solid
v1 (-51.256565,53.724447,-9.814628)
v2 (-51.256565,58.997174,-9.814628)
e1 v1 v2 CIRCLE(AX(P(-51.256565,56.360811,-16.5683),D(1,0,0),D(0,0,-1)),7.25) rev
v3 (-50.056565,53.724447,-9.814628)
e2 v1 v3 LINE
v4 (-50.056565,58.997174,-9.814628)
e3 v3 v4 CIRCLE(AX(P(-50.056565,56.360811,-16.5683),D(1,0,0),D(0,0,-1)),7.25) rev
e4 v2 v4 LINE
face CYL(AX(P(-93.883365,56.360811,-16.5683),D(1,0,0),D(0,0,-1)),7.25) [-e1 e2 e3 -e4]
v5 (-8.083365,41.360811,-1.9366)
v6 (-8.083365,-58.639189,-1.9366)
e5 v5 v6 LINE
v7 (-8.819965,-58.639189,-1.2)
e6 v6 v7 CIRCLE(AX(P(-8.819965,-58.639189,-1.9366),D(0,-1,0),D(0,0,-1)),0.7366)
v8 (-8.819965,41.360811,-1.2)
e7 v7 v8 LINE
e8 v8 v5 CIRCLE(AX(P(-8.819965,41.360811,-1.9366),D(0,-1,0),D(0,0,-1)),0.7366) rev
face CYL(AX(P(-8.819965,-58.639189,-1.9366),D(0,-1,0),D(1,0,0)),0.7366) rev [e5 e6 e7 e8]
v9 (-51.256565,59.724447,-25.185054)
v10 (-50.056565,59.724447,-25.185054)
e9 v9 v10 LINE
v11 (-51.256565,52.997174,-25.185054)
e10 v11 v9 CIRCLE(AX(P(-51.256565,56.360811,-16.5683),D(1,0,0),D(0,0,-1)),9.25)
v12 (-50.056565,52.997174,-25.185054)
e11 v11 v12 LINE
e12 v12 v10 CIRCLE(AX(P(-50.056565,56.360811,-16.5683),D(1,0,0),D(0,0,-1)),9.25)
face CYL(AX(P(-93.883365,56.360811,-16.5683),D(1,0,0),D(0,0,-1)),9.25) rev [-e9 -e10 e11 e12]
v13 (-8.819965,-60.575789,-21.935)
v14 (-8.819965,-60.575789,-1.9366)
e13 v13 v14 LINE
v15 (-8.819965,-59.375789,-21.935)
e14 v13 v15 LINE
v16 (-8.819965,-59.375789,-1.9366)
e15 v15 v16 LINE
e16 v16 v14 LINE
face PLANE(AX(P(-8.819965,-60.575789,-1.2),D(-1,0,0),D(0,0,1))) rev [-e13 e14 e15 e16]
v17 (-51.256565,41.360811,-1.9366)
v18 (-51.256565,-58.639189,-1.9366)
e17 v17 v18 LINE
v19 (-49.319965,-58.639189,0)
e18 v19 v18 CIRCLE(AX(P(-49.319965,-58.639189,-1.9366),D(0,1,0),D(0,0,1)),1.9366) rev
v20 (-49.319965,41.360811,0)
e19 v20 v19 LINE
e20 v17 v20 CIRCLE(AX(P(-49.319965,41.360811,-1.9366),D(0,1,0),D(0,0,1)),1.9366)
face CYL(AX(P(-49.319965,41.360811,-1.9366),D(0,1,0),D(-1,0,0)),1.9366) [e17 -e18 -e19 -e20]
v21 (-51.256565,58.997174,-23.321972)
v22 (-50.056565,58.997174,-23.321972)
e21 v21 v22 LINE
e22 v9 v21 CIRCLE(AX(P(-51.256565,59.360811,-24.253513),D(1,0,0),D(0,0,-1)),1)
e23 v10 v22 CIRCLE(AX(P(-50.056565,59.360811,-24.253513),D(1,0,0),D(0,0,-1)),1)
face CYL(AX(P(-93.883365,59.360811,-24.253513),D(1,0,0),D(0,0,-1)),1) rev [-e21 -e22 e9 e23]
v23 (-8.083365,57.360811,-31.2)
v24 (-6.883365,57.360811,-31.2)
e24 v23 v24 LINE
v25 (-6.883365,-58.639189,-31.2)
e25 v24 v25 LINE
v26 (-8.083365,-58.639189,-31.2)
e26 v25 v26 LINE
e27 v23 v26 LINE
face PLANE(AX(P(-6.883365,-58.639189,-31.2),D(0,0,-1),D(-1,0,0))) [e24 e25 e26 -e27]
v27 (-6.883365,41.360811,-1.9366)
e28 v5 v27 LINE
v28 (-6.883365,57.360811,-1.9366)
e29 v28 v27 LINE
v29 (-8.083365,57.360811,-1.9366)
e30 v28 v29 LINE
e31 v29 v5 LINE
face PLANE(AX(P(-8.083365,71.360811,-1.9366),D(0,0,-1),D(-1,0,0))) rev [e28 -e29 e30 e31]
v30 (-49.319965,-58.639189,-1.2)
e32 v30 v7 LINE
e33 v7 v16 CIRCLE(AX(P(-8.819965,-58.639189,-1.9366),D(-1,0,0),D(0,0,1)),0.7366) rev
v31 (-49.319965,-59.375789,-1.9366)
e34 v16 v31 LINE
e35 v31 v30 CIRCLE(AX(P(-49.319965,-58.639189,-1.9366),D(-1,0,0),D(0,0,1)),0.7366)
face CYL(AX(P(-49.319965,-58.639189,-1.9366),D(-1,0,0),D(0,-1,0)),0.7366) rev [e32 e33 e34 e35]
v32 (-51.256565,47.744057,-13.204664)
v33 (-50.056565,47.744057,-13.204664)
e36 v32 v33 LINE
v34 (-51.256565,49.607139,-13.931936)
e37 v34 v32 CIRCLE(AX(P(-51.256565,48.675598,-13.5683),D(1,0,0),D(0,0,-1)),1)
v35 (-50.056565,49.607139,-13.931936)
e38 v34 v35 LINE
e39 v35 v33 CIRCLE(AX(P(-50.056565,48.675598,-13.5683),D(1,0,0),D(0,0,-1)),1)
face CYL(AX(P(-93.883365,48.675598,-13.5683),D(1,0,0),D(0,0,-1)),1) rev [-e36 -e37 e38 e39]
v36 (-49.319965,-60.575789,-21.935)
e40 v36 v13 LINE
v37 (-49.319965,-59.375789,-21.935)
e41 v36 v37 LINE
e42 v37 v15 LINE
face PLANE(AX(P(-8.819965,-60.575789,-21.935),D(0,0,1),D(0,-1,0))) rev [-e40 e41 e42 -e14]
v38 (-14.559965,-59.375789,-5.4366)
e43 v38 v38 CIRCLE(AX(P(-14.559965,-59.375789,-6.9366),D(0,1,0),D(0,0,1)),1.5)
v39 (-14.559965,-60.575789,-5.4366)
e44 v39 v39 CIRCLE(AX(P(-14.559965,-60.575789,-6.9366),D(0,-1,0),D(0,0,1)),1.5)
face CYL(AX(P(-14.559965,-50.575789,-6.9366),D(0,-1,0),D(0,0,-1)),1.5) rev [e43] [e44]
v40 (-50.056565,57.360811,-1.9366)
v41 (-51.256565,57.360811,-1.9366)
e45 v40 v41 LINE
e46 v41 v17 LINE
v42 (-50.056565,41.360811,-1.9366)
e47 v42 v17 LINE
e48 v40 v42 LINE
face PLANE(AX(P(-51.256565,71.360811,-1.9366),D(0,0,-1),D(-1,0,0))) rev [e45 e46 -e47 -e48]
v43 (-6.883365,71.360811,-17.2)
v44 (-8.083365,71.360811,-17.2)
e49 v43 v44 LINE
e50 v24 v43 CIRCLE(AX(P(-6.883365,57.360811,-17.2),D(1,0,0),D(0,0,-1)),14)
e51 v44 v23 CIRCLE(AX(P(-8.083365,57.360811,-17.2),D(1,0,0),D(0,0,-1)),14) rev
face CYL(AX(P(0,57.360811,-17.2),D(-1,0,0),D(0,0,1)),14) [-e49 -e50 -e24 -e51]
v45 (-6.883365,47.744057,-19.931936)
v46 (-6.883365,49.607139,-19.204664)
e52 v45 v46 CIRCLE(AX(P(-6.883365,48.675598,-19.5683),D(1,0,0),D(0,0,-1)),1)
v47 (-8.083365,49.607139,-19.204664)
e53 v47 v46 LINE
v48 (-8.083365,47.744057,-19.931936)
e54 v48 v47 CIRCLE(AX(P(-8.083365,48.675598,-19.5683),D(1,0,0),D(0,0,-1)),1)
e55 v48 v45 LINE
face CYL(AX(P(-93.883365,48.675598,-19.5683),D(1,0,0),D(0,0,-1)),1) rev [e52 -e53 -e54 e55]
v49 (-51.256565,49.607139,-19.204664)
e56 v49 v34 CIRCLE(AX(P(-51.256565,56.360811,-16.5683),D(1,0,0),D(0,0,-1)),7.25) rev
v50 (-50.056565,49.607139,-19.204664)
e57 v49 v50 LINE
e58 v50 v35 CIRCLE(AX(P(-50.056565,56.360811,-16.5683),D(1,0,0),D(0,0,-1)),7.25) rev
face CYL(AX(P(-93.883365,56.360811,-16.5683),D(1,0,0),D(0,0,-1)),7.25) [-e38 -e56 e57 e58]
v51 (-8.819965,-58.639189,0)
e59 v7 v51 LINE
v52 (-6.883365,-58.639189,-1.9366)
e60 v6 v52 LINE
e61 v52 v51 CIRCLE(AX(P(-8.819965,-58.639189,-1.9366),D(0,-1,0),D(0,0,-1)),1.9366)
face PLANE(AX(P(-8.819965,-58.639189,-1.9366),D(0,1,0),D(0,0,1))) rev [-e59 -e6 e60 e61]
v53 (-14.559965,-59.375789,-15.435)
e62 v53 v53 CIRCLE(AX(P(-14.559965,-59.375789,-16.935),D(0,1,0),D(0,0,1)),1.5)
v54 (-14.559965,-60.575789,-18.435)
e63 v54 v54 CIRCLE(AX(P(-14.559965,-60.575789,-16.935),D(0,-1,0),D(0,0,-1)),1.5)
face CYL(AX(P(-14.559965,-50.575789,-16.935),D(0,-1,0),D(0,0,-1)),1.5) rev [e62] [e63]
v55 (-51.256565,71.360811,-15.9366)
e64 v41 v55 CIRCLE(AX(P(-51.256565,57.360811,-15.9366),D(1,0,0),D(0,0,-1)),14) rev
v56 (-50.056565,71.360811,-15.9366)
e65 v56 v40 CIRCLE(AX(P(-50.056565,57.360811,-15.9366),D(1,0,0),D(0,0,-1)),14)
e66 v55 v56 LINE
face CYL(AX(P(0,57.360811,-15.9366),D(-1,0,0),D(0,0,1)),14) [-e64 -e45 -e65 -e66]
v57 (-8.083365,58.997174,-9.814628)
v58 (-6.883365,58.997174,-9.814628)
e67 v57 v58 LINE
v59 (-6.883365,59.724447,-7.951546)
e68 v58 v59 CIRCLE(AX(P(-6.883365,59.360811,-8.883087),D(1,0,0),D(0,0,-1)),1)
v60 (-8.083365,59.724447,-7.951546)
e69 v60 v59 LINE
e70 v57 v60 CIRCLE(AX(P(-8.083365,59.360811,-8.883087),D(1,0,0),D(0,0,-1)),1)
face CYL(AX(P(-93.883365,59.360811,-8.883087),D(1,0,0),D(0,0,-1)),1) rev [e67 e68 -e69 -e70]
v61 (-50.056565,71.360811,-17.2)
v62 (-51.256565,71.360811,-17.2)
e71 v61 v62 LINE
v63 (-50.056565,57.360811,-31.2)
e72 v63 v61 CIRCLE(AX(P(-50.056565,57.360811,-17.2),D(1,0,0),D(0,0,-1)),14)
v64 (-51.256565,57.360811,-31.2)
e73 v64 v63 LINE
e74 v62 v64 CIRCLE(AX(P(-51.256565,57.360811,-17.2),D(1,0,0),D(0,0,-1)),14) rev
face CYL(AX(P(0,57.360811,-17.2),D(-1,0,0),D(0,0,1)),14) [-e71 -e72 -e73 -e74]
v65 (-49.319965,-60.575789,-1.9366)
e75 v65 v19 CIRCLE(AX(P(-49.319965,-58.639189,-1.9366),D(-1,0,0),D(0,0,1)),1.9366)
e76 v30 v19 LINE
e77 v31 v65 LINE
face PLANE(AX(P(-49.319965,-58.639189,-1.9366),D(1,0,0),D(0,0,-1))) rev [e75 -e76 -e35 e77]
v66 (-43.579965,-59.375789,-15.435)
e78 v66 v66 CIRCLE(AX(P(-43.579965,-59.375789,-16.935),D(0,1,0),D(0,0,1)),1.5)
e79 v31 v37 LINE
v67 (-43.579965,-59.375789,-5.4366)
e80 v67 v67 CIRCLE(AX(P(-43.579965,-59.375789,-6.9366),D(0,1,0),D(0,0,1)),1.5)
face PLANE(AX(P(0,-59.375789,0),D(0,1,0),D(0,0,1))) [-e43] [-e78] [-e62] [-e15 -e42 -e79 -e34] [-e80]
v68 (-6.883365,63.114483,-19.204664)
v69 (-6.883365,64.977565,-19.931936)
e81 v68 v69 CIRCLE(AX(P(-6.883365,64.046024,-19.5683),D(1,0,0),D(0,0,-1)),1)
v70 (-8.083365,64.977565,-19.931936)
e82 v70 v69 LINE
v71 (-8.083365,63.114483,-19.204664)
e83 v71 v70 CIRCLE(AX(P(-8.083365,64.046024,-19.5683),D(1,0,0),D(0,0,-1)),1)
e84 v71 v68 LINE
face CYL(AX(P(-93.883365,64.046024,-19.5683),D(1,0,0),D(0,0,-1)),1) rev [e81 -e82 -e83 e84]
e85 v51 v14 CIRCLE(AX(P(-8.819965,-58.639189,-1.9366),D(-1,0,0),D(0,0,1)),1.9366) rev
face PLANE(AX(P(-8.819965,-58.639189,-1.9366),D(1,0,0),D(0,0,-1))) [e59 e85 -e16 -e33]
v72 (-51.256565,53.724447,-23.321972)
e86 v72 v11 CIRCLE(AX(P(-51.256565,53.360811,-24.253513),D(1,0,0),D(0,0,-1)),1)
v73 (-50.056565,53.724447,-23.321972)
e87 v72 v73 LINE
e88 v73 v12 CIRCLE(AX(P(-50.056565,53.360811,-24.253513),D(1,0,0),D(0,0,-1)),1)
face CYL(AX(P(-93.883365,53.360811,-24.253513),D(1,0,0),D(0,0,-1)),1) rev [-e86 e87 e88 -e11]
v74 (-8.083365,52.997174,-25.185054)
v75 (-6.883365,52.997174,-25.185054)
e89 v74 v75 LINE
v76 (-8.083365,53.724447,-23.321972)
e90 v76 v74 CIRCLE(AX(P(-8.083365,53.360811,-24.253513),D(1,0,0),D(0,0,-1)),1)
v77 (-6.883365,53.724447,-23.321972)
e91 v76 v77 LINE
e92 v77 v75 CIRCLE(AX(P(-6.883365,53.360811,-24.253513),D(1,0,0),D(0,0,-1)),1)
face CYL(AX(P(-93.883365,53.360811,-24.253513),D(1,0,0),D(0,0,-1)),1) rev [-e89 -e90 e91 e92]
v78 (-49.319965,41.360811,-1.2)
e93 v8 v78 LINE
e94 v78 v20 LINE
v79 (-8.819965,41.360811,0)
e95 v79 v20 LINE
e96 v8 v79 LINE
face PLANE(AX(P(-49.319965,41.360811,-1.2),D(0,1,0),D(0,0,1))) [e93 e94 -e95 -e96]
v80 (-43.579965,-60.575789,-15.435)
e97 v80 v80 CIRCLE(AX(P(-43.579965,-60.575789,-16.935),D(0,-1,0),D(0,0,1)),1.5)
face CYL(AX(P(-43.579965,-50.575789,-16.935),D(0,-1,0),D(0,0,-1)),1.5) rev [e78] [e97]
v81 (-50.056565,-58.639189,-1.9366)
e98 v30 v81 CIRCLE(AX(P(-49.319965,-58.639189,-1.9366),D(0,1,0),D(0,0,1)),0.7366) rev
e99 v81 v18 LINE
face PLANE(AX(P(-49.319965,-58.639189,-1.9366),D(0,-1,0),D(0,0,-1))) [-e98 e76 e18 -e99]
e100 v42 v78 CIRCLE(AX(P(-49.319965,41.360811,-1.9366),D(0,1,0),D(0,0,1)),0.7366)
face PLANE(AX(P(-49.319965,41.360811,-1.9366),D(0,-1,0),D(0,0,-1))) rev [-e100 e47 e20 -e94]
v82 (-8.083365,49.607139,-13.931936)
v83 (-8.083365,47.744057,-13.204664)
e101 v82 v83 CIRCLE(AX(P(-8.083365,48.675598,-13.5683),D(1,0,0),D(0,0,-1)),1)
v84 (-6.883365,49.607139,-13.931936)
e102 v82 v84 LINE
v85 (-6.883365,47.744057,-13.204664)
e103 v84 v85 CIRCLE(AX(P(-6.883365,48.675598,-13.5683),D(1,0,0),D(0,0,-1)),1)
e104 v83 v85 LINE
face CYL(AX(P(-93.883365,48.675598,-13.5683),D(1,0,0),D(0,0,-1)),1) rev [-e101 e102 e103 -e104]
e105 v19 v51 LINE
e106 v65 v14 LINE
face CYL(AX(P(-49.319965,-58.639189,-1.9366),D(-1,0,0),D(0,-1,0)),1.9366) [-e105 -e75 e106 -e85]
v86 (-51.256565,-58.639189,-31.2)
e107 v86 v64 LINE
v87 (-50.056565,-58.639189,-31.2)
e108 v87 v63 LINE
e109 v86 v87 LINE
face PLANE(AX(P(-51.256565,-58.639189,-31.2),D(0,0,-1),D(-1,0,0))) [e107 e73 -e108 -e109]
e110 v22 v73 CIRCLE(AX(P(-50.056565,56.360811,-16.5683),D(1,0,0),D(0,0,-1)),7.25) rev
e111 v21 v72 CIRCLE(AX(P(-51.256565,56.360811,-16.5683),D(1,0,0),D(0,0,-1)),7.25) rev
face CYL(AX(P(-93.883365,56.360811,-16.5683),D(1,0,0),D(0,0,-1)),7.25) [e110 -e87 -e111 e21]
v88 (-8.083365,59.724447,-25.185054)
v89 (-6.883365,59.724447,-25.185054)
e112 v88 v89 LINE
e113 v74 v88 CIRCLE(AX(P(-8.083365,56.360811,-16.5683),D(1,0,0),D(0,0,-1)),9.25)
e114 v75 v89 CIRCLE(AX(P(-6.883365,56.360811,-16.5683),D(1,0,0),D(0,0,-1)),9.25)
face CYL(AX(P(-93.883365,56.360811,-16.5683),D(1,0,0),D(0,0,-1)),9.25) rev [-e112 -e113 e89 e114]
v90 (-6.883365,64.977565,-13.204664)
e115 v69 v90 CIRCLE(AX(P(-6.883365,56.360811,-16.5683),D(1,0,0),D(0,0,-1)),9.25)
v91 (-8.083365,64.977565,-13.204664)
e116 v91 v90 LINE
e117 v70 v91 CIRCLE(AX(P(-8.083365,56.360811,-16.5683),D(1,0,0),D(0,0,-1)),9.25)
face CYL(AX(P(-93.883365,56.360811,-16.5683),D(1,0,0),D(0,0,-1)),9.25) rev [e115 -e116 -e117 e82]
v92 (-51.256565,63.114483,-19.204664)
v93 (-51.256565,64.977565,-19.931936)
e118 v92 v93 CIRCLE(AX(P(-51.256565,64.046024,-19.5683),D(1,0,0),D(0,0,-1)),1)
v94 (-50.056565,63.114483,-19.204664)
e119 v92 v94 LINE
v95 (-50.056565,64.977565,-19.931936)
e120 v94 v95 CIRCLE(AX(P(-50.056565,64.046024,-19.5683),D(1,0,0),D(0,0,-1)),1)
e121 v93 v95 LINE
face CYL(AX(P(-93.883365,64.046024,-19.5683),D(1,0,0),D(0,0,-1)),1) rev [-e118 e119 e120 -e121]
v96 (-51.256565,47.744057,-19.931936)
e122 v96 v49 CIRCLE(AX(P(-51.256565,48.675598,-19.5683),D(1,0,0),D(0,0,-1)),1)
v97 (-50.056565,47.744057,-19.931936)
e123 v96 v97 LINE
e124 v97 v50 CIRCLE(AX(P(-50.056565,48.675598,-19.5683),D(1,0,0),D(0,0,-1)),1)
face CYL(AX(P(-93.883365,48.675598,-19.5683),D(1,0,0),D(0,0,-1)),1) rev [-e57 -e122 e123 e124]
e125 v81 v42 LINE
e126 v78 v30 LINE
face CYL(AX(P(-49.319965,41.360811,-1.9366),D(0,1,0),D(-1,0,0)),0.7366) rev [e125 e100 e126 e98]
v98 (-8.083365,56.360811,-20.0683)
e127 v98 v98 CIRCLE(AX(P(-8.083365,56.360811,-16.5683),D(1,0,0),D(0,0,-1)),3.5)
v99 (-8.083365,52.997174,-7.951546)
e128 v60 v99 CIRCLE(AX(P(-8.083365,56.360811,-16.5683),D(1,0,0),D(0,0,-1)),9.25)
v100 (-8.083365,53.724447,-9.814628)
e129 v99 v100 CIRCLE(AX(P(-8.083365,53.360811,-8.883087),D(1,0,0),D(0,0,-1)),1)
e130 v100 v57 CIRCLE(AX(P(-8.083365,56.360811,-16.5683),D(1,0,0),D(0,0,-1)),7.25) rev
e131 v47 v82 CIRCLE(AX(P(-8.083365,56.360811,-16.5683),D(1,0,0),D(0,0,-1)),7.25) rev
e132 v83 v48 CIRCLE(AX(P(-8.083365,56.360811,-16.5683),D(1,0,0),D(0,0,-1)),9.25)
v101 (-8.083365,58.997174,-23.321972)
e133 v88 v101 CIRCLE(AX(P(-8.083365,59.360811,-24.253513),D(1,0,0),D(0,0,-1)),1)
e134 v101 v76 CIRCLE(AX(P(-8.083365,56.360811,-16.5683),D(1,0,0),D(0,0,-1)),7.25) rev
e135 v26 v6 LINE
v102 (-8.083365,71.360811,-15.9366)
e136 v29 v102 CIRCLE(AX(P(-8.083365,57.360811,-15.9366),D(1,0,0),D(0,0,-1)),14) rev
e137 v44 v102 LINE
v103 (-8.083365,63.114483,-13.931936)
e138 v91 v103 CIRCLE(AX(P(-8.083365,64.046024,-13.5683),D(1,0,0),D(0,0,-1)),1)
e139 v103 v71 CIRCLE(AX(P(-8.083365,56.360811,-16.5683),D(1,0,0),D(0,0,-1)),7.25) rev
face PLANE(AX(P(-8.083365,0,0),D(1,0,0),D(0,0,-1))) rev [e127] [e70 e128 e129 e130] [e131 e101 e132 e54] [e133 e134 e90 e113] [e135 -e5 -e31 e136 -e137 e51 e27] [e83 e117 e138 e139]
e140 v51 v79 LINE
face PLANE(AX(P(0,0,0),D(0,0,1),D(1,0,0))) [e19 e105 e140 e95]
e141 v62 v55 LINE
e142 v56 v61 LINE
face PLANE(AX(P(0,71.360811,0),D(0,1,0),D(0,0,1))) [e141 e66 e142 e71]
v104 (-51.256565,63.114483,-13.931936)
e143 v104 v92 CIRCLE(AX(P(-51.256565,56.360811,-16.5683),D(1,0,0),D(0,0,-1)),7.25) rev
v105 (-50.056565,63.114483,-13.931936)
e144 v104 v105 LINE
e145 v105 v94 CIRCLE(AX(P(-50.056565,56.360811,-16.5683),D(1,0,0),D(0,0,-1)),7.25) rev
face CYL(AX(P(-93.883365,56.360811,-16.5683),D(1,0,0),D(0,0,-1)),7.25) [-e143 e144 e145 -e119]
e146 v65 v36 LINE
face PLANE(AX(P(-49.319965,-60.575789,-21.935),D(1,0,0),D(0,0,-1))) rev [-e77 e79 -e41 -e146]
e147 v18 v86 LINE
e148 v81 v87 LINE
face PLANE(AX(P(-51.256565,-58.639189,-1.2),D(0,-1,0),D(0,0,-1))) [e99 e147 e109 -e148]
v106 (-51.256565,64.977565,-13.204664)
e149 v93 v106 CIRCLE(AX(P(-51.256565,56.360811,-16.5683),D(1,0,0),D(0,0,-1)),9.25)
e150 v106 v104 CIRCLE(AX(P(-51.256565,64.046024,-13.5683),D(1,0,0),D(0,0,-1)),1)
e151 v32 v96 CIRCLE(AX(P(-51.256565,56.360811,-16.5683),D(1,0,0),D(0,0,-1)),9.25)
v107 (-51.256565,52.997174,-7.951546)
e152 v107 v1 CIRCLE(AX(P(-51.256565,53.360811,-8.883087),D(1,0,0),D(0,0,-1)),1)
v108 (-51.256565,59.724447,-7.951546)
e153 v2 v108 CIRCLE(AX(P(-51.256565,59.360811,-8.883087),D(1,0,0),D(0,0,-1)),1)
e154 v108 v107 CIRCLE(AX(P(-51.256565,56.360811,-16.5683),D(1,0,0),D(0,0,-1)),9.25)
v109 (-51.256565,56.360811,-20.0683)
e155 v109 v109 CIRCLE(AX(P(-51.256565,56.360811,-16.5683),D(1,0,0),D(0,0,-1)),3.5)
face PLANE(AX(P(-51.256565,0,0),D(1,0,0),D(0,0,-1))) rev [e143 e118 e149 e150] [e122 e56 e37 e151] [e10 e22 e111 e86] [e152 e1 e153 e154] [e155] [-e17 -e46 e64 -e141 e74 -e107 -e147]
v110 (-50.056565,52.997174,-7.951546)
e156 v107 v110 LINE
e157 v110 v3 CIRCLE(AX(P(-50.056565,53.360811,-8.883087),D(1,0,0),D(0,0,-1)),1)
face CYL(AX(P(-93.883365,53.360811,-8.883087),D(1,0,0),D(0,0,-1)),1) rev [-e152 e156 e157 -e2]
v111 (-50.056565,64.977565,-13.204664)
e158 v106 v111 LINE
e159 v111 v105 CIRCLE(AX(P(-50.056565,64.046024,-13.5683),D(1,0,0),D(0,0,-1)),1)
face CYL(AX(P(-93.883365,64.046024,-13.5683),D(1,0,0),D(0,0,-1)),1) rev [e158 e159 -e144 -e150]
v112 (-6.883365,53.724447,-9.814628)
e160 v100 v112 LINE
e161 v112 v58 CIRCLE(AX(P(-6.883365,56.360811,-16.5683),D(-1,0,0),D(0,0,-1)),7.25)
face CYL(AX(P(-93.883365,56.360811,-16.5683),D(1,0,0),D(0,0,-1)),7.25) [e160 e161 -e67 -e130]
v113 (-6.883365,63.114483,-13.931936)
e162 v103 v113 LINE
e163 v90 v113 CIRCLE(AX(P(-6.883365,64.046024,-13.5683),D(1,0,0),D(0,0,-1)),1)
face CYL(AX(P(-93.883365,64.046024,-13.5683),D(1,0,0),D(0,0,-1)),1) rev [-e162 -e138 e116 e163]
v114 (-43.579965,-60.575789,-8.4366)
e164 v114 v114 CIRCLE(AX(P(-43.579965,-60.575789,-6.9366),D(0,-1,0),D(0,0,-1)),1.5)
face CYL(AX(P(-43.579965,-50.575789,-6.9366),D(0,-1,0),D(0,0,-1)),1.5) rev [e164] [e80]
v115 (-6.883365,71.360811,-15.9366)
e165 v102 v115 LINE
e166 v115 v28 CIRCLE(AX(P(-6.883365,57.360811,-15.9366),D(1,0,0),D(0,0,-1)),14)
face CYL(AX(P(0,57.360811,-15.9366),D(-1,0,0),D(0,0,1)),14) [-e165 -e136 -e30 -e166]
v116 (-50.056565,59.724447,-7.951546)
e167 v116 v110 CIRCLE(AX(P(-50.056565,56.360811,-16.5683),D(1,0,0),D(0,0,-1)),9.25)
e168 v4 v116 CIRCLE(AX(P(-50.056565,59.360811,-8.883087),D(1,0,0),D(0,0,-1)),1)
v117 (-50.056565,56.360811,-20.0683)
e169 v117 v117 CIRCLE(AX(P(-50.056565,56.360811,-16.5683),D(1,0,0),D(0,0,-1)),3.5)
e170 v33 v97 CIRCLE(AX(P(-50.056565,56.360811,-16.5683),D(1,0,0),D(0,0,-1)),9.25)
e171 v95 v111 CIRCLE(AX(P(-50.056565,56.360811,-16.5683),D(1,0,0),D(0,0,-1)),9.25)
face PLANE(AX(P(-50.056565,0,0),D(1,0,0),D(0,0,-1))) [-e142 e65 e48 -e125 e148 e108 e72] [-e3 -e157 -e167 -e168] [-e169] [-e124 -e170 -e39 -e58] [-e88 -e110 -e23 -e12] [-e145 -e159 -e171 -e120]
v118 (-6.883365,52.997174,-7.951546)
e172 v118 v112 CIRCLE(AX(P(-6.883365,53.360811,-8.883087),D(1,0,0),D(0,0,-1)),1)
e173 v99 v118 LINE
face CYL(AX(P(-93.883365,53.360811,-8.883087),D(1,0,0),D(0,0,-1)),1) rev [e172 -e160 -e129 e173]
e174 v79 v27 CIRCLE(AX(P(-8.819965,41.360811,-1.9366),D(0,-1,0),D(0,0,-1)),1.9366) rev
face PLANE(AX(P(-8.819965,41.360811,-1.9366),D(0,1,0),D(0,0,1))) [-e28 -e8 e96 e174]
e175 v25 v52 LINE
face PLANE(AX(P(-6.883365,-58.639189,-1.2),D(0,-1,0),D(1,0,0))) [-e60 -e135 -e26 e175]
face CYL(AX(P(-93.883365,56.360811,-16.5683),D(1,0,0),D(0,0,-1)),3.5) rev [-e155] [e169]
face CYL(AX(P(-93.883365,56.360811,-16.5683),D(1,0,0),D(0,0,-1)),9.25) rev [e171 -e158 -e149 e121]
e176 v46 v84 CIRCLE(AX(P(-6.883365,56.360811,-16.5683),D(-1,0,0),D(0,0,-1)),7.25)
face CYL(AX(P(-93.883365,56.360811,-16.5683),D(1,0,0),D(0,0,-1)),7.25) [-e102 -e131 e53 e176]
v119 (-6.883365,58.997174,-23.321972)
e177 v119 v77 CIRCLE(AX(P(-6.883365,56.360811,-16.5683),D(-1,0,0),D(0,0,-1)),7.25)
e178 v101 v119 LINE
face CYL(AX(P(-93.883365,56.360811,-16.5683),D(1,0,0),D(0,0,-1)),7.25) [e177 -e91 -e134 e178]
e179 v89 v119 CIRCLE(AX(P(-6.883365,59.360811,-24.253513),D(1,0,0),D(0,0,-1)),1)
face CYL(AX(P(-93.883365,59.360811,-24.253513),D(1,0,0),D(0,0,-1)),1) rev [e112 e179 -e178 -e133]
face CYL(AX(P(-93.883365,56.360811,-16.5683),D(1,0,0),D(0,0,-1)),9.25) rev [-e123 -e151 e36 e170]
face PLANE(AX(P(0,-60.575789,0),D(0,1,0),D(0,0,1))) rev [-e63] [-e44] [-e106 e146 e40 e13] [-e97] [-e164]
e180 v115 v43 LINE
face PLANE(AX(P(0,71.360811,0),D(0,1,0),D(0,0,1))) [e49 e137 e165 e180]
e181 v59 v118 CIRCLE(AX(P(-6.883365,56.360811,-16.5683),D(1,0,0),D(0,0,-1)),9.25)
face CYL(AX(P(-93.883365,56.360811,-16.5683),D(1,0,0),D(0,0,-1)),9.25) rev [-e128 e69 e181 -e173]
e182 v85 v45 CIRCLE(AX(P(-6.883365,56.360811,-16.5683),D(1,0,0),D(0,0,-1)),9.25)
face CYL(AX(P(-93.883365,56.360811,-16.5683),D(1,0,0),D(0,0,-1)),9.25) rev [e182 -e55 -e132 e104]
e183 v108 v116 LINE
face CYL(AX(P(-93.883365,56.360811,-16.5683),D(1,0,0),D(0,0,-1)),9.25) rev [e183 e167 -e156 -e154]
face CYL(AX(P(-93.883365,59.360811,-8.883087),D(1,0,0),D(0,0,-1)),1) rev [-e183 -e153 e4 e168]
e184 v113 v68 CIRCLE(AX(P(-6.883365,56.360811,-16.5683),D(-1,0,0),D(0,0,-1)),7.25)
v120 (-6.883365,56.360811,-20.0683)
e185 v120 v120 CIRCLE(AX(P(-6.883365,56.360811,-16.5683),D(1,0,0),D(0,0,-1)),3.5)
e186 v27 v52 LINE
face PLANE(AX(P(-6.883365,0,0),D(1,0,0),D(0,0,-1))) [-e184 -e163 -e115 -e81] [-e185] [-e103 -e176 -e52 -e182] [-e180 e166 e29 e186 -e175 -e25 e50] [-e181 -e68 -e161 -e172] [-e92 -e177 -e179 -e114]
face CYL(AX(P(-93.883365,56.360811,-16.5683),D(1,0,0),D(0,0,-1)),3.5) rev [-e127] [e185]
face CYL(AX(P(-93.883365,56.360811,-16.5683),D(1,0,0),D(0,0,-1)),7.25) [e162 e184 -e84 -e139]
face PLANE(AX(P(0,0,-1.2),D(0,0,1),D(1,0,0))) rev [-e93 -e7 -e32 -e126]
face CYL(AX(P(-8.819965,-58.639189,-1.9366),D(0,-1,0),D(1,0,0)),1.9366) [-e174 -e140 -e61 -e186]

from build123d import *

# Parameters (mm, degrees)
SKETCH_1_W                  = 40.5
SKETCH_1_H                  = 100
SM_BASE_FLANGE_1_DEPTH      = 1.2
SM_EDGE_FLANGE_1_DEPTH      = 100
SM_EDGE_FLANGE_1_BEND_DEPTH = 100
SM_EDGE_FLANGE_3_DEPTH      = 40.5
SKETCH_25_R                 = 1.5
CUT_EXTRUDE_1_DEPTH         = 10
SKETCH_26_W                 = 1.2
SKETCH_26_H                 = 29.2634
EXTRUDE_1_DEPTH             = 30
SKETCH_29_R                 = 3.5
CUT_EXTRUDE_2_DEPTH         = 87
FILLET_1_R                  = 14


# Sheet-metal steps are written as plain solids
with BuildPart() as part:
    # Sketch 1 → 基材-凸緣1 (new body)
    with BuildSketch(Plane.XY):
        with Locations((-29.069965263, -8.639189189)):
            Rectangle(SKETCH_1_W, SKETCH_1_H)
    extrude(amount=-SM_BASE_FLANGE_1_DEPTH)

    # 邊線-凸緣1 section (across the edge) → 邊線-凸緣1 (add)
    with BuildSketch(Plane(origin=(-8.083365263, 41.360810811, -1.2), x_dir=(-1, 0, 0), z_dir=(0, -1, 0))):
        with BuildLine():
            Line((-1.2, 0.7366), (-1.2, 30))
            Line((-1.2, 30), (0, 30))
            Line((0, 30), (0, 0.7366))
            ThreePointArc((0, 0.7366), (0.215745145, 0.215745145), (0.7366, 0))
            Line((0.7366, 0), (0.7366, -1.2))
            ThreePointArc((0.7366, -1.2), (-0.632782992, -0.632782992), (-1.2, 0.7366))
        make_face()
    extrude(amount=SM_EDGE_FLANGE_1_DEPTH)

    # 邊線-凸緣1 section 2 (across the edge) → 邊線-凸緣1 bend (add)
    with BuildSketch(Plane(origin=(-50.056565263, -58.639189189, -1.2), x_dir=(1, 0, 0), z_dir=(0, 1, 0))):
        with BuildLine():
            Line((-1.2, 0.7366), (-1.2, 30))
            Line((-1.2, 30), (0, 30))
            Line((0, 30), (0, 0.7366))
            ThreePointArc((0, 0.7366), (0.215745145, 0.215745145), (0.7366, 0))
            Line((0.7366, 0), (0.7366, -1.2))
            ThreePointArc((0.7366, -1.2), (-0.632782992, -0.632782992), (-1.2, 0.7366))
        make_face()
    extrude(amount=SM_EDGE_FLANGE_1_BEND_DEPTH)

    # 邊線-凸緣3 section (across the edge) → 邊線-凸緣3 (add)
    with BuildSketch(Plane(origin=(-8.819965263, -59.375789189, -1.2), x_dir=(0, 1, 0), z_dir=(-1, 0, 0))):
        with BuildLine():
            Line((-1.2, 0.7366), (-1.2, 20.735))
            Line((-1.2, 20.735), (0, 20.735))
            Line((0, 20.735), (0, 0.7366))
            ThreePointArc((0, 0.7366), (0.215745145, 0.215745145), (0.7366, 0))
            Line((0.7366, 0), (0.7366, -1.2))
            ThreePointArc((0.7366, -1.2), (-0.632782992, -0.632782992), (-1.2, 0.7366))
        make_face()
    extrude(amount=SM_EDGE_FLANGE_3_DEPTH)

    # 草圖25 → 除料-伸長1 (cut)
    with BuildSketch(Plane.XZ.offset(60.575789189)):
        with Locations(Location((-43.579965263, -6.9366, 0), (0, 0, 270))):
            Circle(SKETCH_25_R)
        with Locations(Location((-43.579965263, -16.935, 0), (0, 0, 90))):
            Circle(SKETCH_25_R)
        with Locations(Location((-14.559965263, -16.935, 0), (0, 0, 270))):
            Circle(SKETCH_25_R)
        with Locations(Location((-14.559965263, -6.9366, 0), (0, 0, 90))):
            Circle(SKETCH_25_R)
    extrude(amount=-CUT_EXTRUDE_1_DEPTH, mode=Mode.SUBTRACT)

    # 草圖26 → 填料-伸長1 (add)
    with BuildSketch(Plane(origin=(0, 41.360810811, 0), x_dir=(1, 0, 0), z_dir=(0, 1, 0))):
        with Locations((-50.656565263, 16.5683)):
            Rectangle(SKETCH_26_W, SKETCH_26_H)
        with Locations((-7.483365263, 16.5683)):
            Rectangle(SKETCH_26_W, SKETCH_26_H)
    extrude(amount=EXTRUDE_1_DEPTH)

    # 草圖29 → 除料-伸長2 (cut)
    with BuildSketch(Plane(origin=(-6.883365263, 0, 0), x_dir=(0, 0, -1), z_dir=(1, 0, 0))):
        with Locations((16.5683, 56.360810811)):
            Circle(SKETCH_29_R)
        with BuildLine():
            ThreePointArc((25.185054053, 52.997174447), (25.8183, 56.360810811), (25.185054053, 59.724447174))
            ThreePointArc((25.185054053, 59.724447174), (23.889876711, 60.29235179), (23.321972096, 58.997174447))
            ThreePointArc((23.321972096, 58.997174447), (23.8183, 56.360810811), (23.321972096, 53.724447174))
            ThreePointArc((23.321972096, 53.724447174), (23.889876711, 52.429269832), (25.185054053, 52.997174447))
        make_face()
        with BuildLine():
            ThreePointArc((13.204663636, 64.977564864), (12.636759021, 63.682387522), (13.931936364, 63.114482907))
            ThreePointArc((13.931936364, 63.114482907), (16.5683, 63.610810811), (19.204663636, 63.114482907))
            ThreePointArc((19.204663636, 63.114482907), (20.499840979, 63.682387522), (19.931936364, 64.977564864))
            ThreePointArc((19.931936364, 64.977564864), (16.5683, 65.610810811), (13.204663636, 64.977564864))
        make_face()
        with BuildLine():
            ThreePointArc((13.204663636, 47.744056758), (16.5683, 47.110810811), (19.931936364, 47.744056758))
            ThreePointArc((19.931936364, 47.744056758), (20.499840979, 49.0392341), (19.204663636, 49.607138715))
            ThreePointArc((19.204663636, 49.607138715), (16.5683, 49.110810811), (13.931936364, 49.607138715))
            ThreePointArc((13.931936364, 49.607138715), (12.636759021, 49.0392341), (13.204663636, 47.744056758))
        make_face()
        with BuildLine():
            ThreePointArc((7.951545947, 59.724447174), (7.3183, 56.360810811), (7.951545947, 52.997174447))
            ThreePointArc((7.951545947, 52.997174447), (9.246723289, 52.429269832), (9.814627904, 53.724447174))
            ThreePointArc((9.814627904, 53.724447174), (9.3183, 56.360810811), (9.814627904, 58.997174447))
            ThreePointArc((9.814627904, 58.997174447), (9.246723289, 60.29235179), (7.951545947, 59.724447174))
        make_face()
    extrude(amount=-CUT_EXTRUDE_2_DEPTH, mode=Mode.SUBTRACT)

    # 圓角1
    fillet_1_edges = [part.edges().sort_by_distance(p)[0] for p in [
        (-50.656565263, 71.360810811, -31.2),
        (-50.656565263, 71.360810811, -1.9366),
        (-7.483365263, 71.360810811, -31.2),
        (-7.483365263, 71.360810811, -1.9366),
    ]]
    fillet(fillet_1_edges, radius=FILLET_1_R)


solid = part.part
